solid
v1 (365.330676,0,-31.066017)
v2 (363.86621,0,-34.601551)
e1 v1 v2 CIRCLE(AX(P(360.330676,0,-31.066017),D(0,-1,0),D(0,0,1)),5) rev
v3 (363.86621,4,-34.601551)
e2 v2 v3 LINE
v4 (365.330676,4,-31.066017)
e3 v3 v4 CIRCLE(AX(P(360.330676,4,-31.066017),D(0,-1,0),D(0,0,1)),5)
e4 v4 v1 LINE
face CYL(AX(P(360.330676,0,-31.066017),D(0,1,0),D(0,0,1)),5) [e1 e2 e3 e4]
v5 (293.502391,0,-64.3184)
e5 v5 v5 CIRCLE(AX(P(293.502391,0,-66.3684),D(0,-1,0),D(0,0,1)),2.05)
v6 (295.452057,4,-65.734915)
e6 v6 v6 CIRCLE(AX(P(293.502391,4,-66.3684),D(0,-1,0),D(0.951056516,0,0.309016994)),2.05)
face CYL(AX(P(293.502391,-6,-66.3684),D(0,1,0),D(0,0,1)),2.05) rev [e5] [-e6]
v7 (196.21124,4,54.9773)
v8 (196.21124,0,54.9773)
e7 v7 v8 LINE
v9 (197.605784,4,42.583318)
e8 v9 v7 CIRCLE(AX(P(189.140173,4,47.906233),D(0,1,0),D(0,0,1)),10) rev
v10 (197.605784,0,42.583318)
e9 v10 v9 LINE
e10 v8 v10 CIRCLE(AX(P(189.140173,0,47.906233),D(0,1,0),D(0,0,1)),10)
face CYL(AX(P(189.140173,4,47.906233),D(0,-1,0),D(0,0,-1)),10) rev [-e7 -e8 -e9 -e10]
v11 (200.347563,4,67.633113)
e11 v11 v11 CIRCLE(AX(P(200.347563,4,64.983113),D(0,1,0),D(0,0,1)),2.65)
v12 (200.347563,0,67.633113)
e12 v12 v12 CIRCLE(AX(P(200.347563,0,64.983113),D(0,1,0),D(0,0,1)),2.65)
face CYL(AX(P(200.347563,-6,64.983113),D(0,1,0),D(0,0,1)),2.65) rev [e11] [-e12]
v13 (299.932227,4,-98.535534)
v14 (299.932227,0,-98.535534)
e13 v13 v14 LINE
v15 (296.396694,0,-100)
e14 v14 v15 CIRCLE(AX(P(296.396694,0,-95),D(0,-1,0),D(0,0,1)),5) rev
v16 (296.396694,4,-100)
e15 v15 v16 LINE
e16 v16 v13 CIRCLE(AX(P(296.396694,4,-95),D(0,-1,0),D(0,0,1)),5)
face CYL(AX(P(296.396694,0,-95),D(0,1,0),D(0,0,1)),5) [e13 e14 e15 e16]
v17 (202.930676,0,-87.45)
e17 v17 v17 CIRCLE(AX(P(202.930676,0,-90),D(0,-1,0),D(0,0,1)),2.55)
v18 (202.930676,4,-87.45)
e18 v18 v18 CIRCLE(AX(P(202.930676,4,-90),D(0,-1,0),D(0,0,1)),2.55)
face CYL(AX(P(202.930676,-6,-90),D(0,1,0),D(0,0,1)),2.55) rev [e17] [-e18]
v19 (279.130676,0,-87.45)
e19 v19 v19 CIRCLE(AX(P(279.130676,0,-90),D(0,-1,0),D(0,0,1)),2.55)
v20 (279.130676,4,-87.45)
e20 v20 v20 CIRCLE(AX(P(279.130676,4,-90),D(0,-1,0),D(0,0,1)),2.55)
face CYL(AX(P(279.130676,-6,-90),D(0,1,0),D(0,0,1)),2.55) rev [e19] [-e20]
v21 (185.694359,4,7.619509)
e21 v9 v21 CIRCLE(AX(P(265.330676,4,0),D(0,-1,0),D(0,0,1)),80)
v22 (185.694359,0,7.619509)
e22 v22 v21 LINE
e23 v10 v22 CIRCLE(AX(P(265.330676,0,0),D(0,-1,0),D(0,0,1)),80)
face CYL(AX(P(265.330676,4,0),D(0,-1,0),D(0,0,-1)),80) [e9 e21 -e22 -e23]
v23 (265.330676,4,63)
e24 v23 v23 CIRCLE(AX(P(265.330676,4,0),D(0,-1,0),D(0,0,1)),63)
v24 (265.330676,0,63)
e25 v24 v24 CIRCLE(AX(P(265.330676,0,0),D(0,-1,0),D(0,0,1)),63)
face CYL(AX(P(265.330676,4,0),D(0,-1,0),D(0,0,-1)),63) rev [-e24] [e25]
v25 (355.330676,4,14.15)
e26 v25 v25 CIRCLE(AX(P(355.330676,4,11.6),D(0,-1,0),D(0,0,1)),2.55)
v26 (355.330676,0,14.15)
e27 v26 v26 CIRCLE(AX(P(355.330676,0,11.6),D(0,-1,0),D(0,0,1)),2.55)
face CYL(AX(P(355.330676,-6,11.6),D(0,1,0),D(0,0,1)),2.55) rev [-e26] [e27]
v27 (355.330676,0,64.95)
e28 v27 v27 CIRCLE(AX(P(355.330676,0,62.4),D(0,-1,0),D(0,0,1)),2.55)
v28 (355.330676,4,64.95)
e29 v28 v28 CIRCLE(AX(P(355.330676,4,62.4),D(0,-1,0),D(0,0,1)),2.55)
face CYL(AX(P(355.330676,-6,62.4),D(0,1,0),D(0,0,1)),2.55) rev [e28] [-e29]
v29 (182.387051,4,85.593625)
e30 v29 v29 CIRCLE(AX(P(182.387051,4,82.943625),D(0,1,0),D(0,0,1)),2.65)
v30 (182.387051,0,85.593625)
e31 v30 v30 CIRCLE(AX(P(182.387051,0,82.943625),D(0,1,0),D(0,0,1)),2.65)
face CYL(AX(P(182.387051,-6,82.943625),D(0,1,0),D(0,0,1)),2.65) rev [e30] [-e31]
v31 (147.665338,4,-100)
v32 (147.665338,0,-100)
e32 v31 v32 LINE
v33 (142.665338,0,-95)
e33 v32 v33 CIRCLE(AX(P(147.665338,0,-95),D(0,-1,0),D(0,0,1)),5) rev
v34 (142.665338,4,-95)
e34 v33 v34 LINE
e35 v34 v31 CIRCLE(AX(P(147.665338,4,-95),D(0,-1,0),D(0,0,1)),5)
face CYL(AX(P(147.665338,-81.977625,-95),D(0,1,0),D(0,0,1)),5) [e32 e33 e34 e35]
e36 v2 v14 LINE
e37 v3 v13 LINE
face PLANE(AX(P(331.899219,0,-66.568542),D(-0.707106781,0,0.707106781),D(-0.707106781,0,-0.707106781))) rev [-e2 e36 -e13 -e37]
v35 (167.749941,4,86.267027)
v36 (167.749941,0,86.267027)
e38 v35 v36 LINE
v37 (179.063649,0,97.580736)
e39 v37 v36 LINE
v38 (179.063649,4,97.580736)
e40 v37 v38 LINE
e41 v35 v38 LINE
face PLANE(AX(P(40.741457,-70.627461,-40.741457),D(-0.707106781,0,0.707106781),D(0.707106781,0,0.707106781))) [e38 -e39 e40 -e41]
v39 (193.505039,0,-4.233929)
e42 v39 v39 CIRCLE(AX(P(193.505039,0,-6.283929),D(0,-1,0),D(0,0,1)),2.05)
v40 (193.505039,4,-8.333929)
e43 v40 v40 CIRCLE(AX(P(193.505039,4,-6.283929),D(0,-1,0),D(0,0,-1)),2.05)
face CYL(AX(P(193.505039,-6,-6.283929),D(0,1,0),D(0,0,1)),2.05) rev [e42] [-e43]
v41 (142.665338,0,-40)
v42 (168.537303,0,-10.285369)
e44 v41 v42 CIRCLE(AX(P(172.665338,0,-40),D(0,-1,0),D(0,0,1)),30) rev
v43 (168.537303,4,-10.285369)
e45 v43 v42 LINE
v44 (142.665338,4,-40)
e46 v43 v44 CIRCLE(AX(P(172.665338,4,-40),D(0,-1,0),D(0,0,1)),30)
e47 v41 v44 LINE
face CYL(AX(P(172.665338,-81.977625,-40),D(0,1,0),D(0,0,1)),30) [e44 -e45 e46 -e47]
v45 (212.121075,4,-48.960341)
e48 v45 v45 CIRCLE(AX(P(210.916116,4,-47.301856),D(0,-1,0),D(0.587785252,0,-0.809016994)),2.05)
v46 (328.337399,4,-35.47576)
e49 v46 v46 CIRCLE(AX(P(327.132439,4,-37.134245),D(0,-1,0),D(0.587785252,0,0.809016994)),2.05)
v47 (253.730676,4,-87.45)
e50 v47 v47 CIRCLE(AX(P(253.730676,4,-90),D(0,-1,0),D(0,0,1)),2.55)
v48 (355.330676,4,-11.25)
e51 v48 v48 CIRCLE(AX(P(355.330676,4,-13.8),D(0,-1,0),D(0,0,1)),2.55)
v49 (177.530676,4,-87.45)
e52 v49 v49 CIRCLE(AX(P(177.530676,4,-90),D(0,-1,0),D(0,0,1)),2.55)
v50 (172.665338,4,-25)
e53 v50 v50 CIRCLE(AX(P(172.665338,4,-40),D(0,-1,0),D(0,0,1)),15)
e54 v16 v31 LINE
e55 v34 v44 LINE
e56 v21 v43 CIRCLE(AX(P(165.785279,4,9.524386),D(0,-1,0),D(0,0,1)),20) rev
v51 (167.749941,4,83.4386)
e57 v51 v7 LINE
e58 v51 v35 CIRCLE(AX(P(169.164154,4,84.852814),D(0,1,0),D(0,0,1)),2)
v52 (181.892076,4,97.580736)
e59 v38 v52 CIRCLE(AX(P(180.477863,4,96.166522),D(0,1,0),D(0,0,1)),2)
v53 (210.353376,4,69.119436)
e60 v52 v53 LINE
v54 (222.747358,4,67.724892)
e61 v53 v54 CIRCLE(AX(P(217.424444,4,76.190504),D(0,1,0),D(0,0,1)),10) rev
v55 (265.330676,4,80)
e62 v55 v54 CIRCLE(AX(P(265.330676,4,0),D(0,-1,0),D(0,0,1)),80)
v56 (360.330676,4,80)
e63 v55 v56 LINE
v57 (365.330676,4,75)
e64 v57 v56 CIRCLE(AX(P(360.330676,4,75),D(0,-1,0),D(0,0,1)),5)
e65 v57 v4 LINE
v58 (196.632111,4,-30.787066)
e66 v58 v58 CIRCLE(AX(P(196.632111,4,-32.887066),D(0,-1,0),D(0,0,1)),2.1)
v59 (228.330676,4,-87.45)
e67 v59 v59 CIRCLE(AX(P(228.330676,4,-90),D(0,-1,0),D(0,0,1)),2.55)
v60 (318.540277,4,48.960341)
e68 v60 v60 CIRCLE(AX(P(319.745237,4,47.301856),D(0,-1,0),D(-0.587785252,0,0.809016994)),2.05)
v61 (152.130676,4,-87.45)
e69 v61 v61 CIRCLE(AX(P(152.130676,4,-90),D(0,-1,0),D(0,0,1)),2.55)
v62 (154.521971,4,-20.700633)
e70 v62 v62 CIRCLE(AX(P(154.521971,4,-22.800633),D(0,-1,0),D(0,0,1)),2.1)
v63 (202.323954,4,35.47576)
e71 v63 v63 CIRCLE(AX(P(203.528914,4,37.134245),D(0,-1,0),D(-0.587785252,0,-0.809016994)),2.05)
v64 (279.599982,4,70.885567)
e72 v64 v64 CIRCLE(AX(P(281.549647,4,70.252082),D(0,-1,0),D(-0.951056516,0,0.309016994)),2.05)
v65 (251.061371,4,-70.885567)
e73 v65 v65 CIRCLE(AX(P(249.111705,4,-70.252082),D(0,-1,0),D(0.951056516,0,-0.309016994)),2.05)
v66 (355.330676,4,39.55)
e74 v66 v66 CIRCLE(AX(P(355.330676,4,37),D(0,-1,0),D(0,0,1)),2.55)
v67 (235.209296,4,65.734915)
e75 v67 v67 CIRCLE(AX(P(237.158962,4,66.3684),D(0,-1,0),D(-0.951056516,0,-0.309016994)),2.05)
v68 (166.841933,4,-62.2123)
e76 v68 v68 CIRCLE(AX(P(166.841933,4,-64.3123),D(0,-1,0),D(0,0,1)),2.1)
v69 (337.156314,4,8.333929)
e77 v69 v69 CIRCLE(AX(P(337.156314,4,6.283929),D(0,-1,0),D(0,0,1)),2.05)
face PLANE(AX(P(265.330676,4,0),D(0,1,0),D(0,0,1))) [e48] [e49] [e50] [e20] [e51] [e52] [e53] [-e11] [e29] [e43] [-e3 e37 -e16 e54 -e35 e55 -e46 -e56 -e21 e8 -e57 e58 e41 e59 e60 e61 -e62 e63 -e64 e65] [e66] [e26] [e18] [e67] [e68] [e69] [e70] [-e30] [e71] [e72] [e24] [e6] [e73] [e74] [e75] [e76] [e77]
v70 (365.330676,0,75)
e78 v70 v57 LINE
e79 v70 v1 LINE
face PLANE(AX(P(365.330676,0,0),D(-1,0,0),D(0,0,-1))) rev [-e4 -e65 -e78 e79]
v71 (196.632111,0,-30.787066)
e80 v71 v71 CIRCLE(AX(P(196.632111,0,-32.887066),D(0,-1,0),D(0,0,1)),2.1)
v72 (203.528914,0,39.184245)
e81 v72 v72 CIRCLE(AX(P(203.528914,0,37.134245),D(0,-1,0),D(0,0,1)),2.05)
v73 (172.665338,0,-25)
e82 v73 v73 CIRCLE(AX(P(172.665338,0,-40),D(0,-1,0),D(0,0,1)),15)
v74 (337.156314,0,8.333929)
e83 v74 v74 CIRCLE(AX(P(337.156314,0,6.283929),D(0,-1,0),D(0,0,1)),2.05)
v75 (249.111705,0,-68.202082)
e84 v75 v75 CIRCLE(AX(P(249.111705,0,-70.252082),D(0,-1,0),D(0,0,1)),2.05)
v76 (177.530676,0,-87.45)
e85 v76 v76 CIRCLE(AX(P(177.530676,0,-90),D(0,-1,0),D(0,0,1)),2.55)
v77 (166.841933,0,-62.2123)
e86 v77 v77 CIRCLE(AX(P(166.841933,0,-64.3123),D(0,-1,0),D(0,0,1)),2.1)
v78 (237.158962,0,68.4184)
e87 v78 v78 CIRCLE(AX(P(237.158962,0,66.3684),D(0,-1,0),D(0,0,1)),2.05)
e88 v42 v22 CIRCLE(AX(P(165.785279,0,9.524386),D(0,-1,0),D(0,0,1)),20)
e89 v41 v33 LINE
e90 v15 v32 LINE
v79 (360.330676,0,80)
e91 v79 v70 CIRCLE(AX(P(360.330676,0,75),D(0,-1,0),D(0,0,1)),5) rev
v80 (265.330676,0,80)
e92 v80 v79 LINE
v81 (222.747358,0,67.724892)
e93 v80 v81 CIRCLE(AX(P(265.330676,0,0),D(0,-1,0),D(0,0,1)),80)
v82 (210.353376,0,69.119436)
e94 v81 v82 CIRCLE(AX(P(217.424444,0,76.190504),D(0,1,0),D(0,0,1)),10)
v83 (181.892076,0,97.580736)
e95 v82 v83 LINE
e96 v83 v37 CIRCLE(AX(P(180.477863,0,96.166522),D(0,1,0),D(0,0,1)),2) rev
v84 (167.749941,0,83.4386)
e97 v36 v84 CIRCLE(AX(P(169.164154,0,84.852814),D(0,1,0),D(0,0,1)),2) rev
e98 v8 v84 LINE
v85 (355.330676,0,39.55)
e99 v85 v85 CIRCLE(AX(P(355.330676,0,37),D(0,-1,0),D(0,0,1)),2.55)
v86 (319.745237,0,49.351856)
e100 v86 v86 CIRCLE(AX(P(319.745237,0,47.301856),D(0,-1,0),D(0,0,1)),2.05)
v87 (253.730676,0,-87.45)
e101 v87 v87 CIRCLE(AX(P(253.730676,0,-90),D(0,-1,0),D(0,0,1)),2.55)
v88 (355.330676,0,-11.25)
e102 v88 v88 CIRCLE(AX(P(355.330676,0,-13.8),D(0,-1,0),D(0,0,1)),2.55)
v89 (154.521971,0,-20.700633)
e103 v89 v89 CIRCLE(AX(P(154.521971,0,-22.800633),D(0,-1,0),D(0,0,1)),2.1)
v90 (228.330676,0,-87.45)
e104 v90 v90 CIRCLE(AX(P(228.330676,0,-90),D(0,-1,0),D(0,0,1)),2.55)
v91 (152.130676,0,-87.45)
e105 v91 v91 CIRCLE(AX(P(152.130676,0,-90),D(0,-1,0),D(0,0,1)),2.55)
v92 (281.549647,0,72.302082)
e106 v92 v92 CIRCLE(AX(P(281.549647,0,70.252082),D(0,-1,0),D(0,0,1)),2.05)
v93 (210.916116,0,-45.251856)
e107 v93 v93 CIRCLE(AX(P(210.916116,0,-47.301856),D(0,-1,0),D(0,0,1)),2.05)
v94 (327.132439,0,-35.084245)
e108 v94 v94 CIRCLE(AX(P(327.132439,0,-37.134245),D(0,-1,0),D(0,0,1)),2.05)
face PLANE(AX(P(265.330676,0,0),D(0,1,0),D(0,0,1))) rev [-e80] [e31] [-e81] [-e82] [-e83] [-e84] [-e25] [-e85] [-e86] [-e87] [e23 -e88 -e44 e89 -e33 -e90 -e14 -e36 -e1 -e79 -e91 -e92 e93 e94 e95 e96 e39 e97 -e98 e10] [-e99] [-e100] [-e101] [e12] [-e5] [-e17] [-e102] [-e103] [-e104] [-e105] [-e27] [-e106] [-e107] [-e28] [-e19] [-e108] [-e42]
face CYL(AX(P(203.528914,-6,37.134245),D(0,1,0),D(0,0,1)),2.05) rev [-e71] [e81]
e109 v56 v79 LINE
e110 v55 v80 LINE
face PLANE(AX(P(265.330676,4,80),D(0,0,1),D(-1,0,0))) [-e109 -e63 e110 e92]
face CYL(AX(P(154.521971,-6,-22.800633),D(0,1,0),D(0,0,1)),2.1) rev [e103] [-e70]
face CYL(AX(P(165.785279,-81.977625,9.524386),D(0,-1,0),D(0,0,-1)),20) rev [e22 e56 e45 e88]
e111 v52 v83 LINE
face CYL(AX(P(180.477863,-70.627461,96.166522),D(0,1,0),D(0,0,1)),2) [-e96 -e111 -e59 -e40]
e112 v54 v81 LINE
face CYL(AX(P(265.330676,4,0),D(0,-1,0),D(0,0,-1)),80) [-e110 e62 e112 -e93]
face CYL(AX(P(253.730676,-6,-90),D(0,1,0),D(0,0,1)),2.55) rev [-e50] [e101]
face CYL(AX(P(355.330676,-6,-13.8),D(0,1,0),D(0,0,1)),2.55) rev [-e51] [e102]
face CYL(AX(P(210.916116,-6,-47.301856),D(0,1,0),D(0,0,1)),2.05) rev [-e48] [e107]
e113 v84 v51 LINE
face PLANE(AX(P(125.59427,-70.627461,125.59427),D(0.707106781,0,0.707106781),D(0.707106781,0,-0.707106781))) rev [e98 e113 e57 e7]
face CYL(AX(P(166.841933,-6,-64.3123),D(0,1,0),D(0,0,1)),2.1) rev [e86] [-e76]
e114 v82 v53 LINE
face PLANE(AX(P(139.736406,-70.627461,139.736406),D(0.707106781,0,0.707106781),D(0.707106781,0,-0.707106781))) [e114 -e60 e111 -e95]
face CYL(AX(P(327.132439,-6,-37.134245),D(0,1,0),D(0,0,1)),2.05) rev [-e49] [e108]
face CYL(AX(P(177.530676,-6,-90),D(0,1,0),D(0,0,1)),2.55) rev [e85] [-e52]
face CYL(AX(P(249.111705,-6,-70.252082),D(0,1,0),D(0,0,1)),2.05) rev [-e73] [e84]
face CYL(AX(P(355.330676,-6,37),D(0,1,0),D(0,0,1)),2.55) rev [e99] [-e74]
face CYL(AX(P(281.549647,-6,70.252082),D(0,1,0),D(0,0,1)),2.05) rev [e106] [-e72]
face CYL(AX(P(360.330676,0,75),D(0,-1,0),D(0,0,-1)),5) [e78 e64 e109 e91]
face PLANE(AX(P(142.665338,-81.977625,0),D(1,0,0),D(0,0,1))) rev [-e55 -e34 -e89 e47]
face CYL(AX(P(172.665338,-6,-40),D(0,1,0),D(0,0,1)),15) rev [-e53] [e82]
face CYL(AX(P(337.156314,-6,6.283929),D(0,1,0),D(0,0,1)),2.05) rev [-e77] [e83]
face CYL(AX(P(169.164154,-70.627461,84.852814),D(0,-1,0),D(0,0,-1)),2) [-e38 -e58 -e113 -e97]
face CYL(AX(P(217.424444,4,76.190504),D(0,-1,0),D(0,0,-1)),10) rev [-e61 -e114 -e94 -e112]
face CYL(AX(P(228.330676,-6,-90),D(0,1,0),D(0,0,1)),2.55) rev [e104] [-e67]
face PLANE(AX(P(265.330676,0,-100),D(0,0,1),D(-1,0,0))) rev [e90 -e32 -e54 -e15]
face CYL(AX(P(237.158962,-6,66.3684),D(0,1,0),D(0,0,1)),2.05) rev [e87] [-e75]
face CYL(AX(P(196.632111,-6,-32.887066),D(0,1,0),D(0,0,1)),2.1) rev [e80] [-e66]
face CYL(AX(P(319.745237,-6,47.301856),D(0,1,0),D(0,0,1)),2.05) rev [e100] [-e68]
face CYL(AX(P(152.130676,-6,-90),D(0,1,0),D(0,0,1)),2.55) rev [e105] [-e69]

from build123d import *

# Parameters (mm, degrees)
SKETCH_1_R               = 80
SKETCH_1_R_2             = 63
EXTRUDE_1_DEPTH          = 4
EXTRUDE_START            = -4
EXTRUDE_2_DEPTH          = 4
SKETCH_3_R               = 2.1
CUT_EXTRUDE_1_DEPTH      = 10
SKETCH_4_R               = 2.05
CUT_EXTRUDE_2_DEPTH      = 10
PATTERN_CIRCULAR_1_COUNT = 10
SKETCH_5_W               = 20
SKETCH_5_H               = 113.13708499
SKETCH_5_W_2             = 155.80242317
SKETCH_5_H_2             = 20
EXTRUDE_3_DEPTH          = 4
SKETCH_6_R               = 2.55
CUT_EXTRUDE_3_DEPTH      = 10
FILLET_1_R               = 20
SKETCH_7_R               = 15
CUT_EXTRUDE_4_DEPTH      = 10
FILLET_2_R               = 5
SKETCH_8_W               = 256.678769512
SKETCH_8_H               = 176.797047192
CUT_EXTRUDE_5_DEPTH      = 290
EXTRUDE_4_DEPTH          = 4
FILLET_3_R               = 10
FILLET_4_R               = 2
CUT_EXTRUDE_6_DEPTH      = 10


with BuildPart() as part:
    # 草图1 → 凸台-拉伸1 (new body)
    # profile 1 of 5: a face of its own
    with BuildSketch(Plane(origin=(0, 0, 0), x_dir=(1, 0, 0), z_dir=(0, 1, 0))):
        with BuildLine():
            ThreePointArc((0, -80), (-56.568542608, -56.568542382), (-80, 3.2e-07))
            Line((-80, 3.2e-07), (-80, -80))
            Line((-80, -80), (0, -80))
        make_face()
    # profile 2 of 5: a face of its own
    with BuildSketch(Plane(origin=(0, 0, 0), x_dir=(1, 0, 0), z_dir=(0, 1, 0))):
        Circle(SKETCH_1_R)
        with Locations(Location((0, 0, 0), (0, 0, 270))):
            Circle(SKETCH_1_R_2, mode=Mode.SUBTRACT)
    # profile 3 of 5: a face of its own
    with BuildSketch(Plane(origin=(0, 0, 0), x_dir=(1, 0, 0), z_dir=(0, 1, 0))):
        with BuildLine():
            ThreePointArc((-80, 3.2e-07), (-73.91036254, 30.614674737), (-56.568542495, 56.568542495))
            Line((-56.568542495, 56.568542495), (-80, 33.13708499))
            Line((-80, 33.13708499), (-80, 3.2e-07))
        make_face()
    # profile 4 of 5: a face of its own
    with BuildSketch(Plane(origin=(0, 0, 0), x_dir=(1, 0, 0), z_dir=(0, 1, 0))):
        with BuildLine():
            Line((0, 80), (-33.13708499, 80))
            Line((-33.13708499, 80), (-56.568542495, 56.568542495))
            ThreePointArc((-56.568542495, 56.568542495), (-30.614674589, 73.910362601), (0, 80))
        make_face()
    # profile 5 of 5: a face of its own
    with BuildSketch(Plane(origin=(0, 0, 0), x_dir=(1, 0, 0), z_dir=(0, 1, 0))):
        with BuildLine():
            Line((80, 80), (0, 80))
            ThreePointArc((0, 80), (56.568542495, 56.568542495), (80, 0))
            Line((80, 0), (80, 80))
        make_face()
    extrude(amount=EXTRUDE_1_DEPTH)


with BuildPart() as body_2:
    # 草图2 → 凸台-拉伸2 (new body)
    with BuildSketch(Plane(origin=(0, 4, 0), x_dir=(1, 0, 0), z_dir=(0, 1, 0)).offset(EXTRUDE_START)):
        with BuildLine():
            Line((122.66533818, 80), (80, 80))
            Line((80, 80), (80, 10))
            Line((80, 10), (92.66533818, 10))
            ThreePointArc((92.66533818, 10), (113.878541616, 18.786796564), (122.66533818, 40))
            Line((122.66533818, 40), (122.66533818, 80))
        make_face()
    extrude(amount=EXTRUDE_2_DEPTH)


with BuildPart() as part_1:
    add(part.part)

    # Combine 5: union body 2
    add(body_2.part)

    # 草图3 → 切除-拉伸1 (cut)
    with BuildSketch(Plane(origin=(0, 4, 0), x_dir=(1, 0, 0), z_dir=(0, 1, 0))):
        with Locations(Location((98.488743184, 64.31230047, 0), (0, 0, 270))):
            Circle(SKETCH_3_R)
        with Locations(Location((110.808705509, 22.800633094, 0), (0, 0, 270))):
            Circle(SKETCH_3_R)
        with Locations(Location((68.698565846, 32.887066435, 0), (0, 0, 270))):
            Circle(SKETCH_3_R)
    extrude(amount=-CUT_EXTRUDE_1_DEPTH, mode=Mode.SUBTRACT)

    # 草图4 → 切除-拉伸2 (cut)
    with BuildSketch(Plane(origin=(0, 4, 0), x_dir=(1, 0, 0), z_dir=(0, 1, 0))):
        with Locations(Location((-71.825637732, -6.283929052, 0), (0, 0, 270))):
            Circle(SKETCH_4_R)
    cut_extrude_2 = extrude(amount=-CUT_EXTRUDE_2_DEPTH, mode=Mode.SUBTRACT)

    # 阵列(圆周)1: 切除-拉伸2 ×10 about axis
    pattern_circular_1_axis = Axis((0, 0, 0), (0, 1, 0))
    for i in range(1, PATTERN_CIRCULAR_1_COUNT):
        add(cut_extrude_2.rotate(pattern_circular_1_axis, i * 360 / PATTERN_CIRCULAR_1_COUNT), mode=Mode.SUBTRACT)

    # 草图5 → 凸台-拉伸3 (add)
    with BuildSketch(Plane(origin=(0, 4, 0), x_dir=(1, 0, 0), z_dir=(0, 1, 0))):
        with Locations((-90, -23.431457505)):
            Rectangle(SKETCH_5_W, SKETCH_5_H)
        Polygon((-33.13708499, 80), (-33.13708499, 100), (-100, 33.13708499), (-80, 33.13708499), align=None)
        with Locations((44.764126595, 90)):
            Rectangle(SKETCH_5_W_2, SKETCH_5_H_2)
    extrude(amount=-EXTRUDE_3_DEPTH)

    # 草图6 → 切除-拉伸3 (cut)
    with BuildSketch(Plane(origin=(0, 4, 0), x_dir=(1, 0, 0), z_dir=(0, 1, 0))):
        with Locations(Location((-13.8, 90, 0), (0, 0, 270))):
            Circle(SKETCH_6_R)
        with Locations(Location((11.6, 90, 0), (0, 0, 270))):
            Circle(SKETCH_6_R)
        with Locations(Location((37, 90, 0), (0, 0, 270))):
            Circle(SKETCH_6_R)
        with Locations(Location((62.4, 90, 0), (0, 0, 270))):
            Circle(SKETCH_6_R)
        with Locations(Location((87.8, 90, 0), (0, 0, 270))):
            Circle(SKETCH_6_R)
        with Locations(Location((113.2, 90, 0), (0, 0, 270))):
            Circle(SKETCH_6_R)
        with Locations(Location((-90, 13.8, 0), (0, 0, 270))):
            Circle(SKETCH_6_R)
        with Locations(Location((-90, -11.6, 0), (0, 0, 270))):
            Circle(SKETCH_6_R)
        with Locations(Location((-90, -37, 0), (0, 0, 270))):
            Circle(SKETCH_6_R)
        with Locations(Location((-90, -62.4, 0), (0, 0, 270))):
            Circle(SKETCH_6_R)
    extrude(amount=-CUT_EXTRUDE_3_DEPTH, mode=Mode.SUBTRACT)

    # 圆角1
    fillet_1_edges = [part_1.edges().sort_by_distance(p)[0] for p in [
        (80, 2, -10),
    ]]
    fillet(fillet_1_edges, radius=FILLET_1_R)

    # 草图7 → 切除-拉伸4 (cut)
    with BuildSketch(Plane(origin=(0, 4, 0), x_dir=(1, 0, 0), z_dir=(0, 1, 0))):
        with Locations(Location((92.66533818, 40, 0), (0, 0, 270))):
            Circle(SKETCH_7_R)
    extrude(amount=-CUT_EXTRUDE_4_DEPTH, mode=Mode.SUBTRACT)

    # 圆角2
    fillet_2_edges = [part_1.edges().sort_by_distance(p)[0] for p in [
        (-100, 2, 80),
        (-100, 2, -33.13708499),
        (-33.13708499, 2, -100),
        (122.66533818, 2, -100),
    ]]
    fillet(fillet_2_edges, radius=FILLET_2_R)


with BuildPart() as body_2_2:
    # 镜向2: mirrored copy
    add(part_1.part.mirror(Plane(origin=(132.66533818, 0, 0), x_dir=(0, 0, 1), z_dir=(1, 0, 0))))

    # 草图9 → 凸台-拉伸4 (add)
    with BuildSketch(Plane(origin=(0, 4, 0), x_dir=(1, 0, 0), z_dir=(0, 1, 0))):
        with BuildLine():
            Line((166.335726994, -84.852813742), (180.477862617, -98.994949366))
            Line((180.477862617, -98.994949366), (216.27688337, -63.195928613))
            ThreePointArc((216.27688337, -63.195928613), (208.762133865, -56.568542495), (202.134747746, -49.05379299))
            Line((202.134747746, -49.05379299), (166.335726994, -84.852813742))
        make_face()
    extrude(amount=-EXTRUDE_4_DEPTH)

    # 圆角3
    fillet_3_edges = [body_2_2.edges().sort_by_distance(p)[0] for p in [
        (202.134747746, 2, 49.05379299),
        (216.27688337, 2, 63.195928613),
    ]]
    fillet(fillet_3_edges, radius=FILLET_3_R)

    # 圆角4
    fillet_4_edges = [body_2_2.edges().sort_by_distance(p)[0] for p in [
        (166.335726994, 2, 84.852813742),
        (180.477862617, 2, 98.994949366),
    ]]
    fillet(fillet_4_edges, radius=FILLET_4_R)

    # 草图10 → 切除-拉伸6 (cut)
    with BuildSketch(Plane(origin=(0, 4, 0), x_dir=(1, 0, 0), z_dir=(0, 1, 0))):
        with BuildLine():
            ThreePointArc((202.221396139, -63.109280221), (198.473730199, -63.109280221), (198.473730199, -66.856946161))
            Line((198.473730199, -66.856946161), (202.221396139, -63.109280221))
        make_face()
        with BuildLine():
            Line((202.221396139, -63.109280221), (198.473730199, -66.856946161))
            ThreePointArc((198.473730199, -66.856946161), (201.361674265, -67.431393952), (202.997563169, -64.983113191))
            ThreePointArc((202.997563169, -64.983113191), (202.79584393, -63.969002095), (202.221396139, -63.109280221))
        make_face()
        with BuildLine():
            ThreePointArc((184.260883897, -81.069792463), (180.513217957, -81.069792463), (180.513217957, -84.817458403))
            Line((180.513217957, -84.817458403), (184.260883897, -81.069792463))
        make_face()
        with BuildLine():
            Line((184.260883897, -81.069792463), (180.513217957, -84.817458403))
            ThreePointArc((180.513217957, -84.817458403), (183.401162022, -85.391906194), (185.037050927, -82.943625433))
            ThreePointArc((185.037050927, -82.943625433), (184.835331688, -81.929514337), (184.260883897, -81.069792463))
        make_face()
    extrude(amount=-CUT_EXTRUDE_6_DEPTH, mode=Mode.SUBTRACT)


with BuildPart() as part_2:
    add(part_1.part)

    # 草图8 → 切除-拉伸5 (cut)
    with BuildSketch(Plane(origin=(132.66533818, 0, 0), x_dir=(0, 0, -1), z_dir=(1, 0, 0))):
        with Locations((25.923800224, 29.064395705)):
            Rectangle(SKETCH_8_W, SKETCH_8_H)
    extrude(amount=-CUT_EXTRUDE_5_DEPTH, mode=Mode.SUBTRACT)


solid = body_2_2.part
